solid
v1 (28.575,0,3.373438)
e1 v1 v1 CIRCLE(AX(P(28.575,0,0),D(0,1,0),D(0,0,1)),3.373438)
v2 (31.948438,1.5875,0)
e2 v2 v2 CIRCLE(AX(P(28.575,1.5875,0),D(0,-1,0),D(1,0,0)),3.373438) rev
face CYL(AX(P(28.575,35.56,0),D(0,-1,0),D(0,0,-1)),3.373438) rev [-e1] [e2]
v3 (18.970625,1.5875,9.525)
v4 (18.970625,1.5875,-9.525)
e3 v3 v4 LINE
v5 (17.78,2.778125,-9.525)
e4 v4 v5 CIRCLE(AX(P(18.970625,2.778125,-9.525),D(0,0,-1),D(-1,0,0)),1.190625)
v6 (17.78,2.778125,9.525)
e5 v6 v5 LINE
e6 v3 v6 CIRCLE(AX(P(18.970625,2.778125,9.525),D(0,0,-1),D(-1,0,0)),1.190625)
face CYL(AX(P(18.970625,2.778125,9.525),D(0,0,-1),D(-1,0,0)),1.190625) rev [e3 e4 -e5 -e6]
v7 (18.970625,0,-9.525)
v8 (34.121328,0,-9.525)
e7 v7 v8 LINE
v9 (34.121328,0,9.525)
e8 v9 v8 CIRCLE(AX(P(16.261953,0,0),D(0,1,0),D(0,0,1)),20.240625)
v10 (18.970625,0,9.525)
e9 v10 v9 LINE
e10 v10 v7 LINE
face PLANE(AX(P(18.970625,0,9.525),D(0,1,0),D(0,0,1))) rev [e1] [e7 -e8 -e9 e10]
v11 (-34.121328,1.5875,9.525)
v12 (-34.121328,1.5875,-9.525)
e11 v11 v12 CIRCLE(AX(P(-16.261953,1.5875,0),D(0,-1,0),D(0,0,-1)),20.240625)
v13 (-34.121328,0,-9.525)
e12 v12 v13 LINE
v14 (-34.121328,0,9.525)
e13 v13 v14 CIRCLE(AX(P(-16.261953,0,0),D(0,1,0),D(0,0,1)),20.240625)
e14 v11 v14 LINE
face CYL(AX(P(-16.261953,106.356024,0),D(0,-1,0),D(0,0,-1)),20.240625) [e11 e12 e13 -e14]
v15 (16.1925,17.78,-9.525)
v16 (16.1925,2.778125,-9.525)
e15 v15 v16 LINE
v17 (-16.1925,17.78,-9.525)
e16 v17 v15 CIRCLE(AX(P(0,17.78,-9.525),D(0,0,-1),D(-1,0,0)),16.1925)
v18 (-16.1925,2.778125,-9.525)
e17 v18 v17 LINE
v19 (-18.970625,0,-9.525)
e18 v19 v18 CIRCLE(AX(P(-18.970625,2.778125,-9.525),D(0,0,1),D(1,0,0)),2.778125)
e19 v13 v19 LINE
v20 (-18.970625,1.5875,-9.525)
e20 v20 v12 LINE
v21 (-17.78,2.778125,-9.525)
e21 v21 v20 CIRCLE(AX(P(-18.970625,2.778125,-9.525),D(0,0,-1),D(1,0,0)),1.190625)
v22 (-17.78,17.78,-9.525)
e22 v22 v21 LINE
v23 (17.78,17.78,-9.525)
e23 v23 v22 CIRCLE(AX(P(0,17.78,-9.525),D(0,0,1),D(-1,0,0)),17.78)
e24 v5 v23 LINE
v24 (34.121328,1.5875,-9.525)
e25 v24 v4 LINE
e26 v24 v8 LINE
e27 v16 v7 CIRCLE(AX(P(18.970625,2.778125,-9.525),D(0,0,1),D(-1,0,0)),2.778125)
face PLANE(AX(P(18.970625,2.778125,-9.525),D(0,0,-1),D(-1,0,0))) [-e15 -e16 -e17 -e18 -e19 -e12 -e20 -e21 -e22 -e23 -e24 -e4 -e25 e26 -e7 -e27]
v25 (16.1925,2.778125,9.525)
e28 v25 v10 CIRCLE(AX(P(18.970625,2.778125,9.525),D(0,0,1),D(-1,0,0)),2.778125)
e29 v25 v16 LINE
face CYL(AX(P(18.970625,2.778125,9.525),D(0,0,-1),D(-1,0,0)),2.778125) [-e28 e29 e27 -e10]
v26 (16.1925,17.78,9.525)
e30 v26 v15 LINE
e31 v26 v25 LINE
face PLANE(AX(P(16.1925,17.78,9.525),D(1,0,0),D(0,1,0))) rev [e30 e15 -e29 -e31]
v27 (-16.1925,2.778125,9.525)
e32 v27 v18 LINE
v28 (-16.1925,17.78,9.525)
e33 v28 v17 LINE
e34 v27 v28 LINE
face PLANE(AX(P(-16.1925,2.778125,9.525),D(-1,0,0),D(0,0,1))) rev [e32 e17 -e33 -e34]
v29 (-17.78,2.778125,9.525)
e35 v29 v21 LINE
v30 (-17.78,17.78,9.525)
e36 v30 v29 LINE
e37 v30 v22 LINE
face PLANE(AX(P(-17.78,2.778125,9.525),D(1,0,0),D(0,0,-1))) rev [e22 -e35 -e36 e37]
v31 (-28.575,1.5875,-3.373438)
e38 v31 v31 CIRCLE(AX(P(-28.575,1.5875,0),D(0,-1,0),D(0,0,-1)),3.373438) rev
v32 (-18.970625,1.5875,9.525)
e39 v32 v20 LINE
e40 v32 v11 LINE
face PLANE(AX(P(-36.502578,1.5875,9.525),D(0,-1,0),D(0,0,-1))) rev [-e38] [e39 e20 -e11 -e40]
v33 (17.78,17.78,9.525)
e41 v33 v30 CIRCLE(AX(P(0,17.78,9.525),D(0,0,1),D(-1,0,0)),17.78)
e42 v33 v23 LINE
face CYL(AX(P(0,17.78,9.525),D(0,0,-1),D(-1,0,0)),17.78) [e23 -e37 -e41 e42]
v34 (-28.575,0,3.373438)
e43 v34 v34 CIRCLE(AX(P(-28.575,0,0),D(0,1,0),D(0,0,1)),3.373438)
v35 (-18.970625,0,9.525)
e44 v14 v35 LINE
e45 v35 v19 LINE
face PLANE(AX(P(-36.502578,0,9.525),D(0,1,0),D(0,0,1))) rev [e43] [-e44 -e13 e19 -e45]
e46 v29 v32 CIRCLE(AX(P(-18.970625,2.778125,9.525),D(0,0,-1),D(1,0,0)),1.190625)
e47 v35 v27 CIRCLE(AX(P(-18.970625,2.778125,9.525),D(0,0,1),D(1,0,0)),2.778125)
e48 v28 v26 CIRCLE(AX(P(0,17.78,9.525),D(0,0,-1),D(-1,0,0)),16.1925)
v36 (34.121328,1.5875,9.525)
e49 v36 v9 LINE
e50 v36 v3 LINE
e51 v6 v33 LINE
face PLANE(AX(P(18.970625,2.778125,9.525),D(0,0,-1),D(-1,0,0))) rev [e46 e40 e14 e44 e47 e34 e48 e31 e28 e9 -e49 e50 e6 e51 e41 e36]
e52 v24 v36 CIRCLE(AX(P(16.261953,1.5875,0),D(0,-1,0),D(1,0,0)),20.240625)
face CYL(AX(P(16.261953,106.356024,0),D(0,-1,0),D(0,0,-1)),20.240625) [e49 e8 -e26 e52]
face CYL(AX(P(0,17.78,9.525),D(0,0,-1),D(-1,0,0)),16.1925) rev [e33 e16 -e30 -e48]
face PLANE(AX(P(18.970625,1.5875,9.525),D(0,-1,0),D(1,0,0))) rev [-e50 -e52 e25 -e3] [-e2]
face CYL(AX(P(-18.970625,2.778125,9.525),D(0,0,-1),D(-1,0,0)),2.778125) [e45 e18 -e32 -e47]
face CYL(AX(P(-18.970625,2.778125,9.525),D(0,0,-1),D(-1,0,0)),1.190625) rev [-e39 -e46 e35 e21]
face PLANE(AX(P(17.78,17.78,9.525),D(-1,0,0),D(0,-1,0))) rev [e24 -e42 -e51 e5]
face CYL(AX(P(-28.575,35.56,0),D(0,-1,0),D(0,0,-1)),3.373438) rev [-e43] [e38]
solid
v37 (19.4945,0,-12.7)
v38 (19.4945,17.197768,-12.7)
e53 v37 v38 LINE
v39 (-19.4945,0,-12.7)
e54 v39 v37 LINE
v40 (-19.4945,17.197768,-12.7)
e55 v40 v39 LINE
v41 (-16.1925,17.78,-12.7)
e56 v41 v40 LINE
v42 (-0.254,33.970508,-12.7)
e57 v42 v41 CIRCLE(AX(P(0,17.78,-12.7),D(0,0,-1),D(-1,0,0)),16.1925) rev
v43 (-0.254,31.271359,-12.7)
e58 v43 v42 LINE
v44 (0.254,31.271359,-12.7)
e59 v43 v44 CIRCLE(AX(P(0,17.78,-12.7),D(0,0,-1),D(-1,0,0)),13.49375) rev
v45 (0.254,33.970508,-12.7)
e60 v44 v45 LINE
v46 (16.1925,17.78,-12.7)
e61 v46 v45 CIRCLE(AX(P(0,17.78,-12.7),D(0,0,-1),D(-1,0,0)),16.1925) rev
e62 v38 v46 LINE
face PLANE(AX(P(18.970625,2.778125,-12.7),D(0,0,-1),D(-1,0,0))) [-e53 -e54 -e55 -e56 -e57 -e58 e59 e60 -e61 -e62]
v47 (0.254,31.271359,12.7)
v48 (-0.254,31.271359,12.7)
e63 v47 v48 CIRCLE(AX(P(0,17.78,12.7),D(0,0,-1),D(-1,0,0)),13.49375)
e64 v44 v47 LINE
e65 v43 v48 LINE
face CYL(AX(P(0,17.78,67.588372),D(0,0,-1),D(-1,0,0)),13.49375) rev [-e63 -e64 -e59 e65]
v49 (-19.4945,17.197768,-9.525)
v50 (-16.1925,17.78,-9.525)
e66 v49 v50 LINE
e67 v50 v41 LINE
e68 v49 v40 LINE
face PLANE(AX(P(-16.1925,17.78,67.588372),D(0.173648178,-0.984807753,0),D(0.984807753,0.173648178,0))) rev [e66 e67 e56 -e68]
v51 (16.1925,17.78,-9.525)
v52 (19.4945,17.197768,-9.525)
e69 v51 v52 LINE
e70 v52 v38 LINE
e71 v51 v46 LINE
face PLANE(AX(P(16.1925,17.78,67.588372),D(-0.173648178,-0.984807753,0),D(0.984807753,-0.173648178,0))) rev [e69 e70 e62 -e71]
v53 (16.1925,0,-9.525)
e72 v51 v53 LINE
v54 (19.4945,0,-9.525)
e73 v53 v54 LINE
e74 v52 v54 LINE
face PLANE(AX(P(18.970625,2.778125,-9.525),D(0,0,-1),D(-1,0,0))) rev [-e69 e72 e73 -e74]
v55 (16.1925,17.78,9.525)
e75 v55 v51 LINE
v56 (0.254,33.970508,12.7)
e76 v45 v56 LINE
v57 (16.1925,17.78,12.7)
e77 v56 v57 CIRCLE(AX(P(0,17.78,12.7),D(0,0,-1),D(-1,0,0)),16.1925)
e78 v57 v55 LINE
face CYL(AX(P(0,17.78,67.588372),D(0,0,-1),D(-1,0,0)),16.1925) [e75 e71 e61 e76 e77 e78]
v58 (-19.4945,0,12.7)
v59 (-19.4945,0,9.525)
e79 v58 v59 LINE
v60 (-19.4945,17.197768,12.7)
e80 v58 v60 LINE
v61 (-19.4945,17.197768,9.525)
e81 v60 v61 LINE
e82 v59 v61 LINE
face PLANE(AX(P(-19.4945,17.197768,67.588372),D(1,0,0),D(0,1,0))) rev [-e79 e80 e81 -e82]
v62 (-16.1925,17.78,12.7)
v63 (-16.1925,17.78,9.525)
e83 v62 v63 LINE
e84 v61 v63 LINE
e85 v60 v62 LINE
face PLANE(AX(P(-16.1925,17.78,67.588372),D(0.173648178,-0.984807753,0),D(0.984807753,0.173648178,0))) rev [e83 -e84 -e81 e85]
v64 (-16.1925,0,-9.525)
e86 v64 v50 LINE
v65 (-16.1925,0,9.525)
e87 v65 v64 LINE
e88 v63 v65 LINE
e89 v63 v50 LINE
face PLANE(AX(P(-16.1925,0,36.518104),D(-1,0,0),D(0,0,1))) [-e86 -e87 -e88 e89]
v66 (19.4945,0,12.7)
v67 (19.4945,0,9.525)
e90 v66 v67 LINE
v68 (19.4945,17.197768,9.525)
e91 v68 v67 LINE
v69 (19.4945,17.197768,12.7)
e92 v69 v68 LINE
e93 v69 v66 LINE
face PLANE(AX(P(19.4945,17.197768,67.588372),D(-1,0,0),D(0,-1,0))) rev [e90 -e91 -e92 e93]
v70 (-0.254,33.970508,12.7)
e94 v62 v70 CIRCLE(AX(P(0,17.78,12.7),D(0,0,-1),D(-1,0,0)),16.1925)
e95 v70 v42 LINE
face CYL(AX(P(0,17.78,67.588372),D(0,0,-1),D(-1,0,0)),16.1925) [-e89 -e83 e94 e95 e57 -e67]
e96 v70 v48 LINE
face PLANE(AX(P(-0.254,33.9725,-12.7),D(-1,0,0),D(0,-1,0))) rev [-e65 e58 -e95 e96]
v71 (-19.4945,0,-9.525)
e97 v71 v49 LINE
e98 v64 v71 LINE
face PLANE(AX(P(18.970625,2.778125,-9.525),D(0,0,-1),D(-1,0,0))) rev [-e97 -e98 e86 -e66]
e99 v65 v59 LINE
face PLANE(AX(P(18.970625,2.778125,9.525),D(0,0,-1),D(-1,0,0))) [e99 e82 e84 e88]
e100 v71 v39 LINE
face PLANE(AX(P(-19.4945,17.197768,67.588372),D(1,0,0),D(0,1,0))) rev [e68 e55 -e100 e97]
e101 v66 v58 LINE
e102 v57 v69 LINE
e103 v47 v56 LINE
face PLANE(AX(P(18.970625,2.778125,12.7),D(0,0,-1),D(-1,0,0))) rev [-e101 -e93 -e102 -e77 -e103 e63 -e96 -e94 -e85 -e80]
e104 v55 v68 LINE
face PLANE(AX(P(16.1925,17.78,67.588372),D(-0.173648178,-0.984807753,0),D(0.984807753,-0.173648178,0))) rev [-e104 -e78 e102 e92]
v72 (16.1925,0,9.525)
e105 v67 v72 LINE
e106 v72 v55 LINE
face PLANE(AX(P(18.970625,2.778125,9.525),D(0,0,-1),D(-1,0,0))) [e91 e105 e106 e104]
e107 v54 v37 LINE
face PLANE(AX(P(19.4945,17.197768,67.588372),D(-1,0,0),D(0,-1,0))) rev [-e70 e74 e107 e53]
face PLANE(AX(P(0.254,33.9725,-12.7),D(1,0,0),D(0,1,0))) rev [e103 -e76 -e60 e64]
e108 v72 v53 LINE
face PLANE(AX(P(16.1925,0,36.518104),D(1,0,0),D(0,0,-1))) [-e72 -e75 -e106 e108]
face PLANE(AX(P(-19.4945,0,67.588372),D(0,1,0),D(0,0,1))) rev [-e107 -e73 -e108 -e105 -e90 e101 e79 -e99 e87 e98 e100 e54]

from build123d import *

# Parameters (mm, degrees)
BOSS_EXTRUDE1_DEPTH      = 9.525
SKETCH2_R                = 3.3734375
CUT_EXTRUDE1_DEPTH       = 52.842814688
BOSS_EXTRUDE2_DEPTH      = 12.7
BOSS_EXTRUDE2_DEPTH_BACK = 12.7
SKETCH3_R                = 13.49375
CUT_EXTRUDE2_START       = -9.525
SKETCH7_W                = 20.310078125
SKETCH7_H                = 17.78
CUT_EXTRUDE2_DEPTH       = 19.05
CUT_EXTRUDE3_DEPTH       = 1.5875
CUT_EXTRUDE4_DEPTH       = 53.518966191
CUT_EXTRUDE4_DEPTH_BACK  = 53.518966191
SKETCH11_W               = 0.508
SKETCH11_H               = 2.7011408


# Read off the part's stored shape, not the designer's step: Cut-Extrude3
with BuildPart() as part:
    # Sketch1 → Boss-Extrude1 (new, symmetric)
    with BuildSketch(Plane.XY):
        with BuildLine():
            Line((-36.502578125, 0), (-18.970625, 0))
            ThreePointArc((-18.970625, 0), (-17.006193974, 0.813693974), (-16.1925, 2.778125))
            Line((-16.1925, 2.778125), (-16.1925, 17.78))
            ThreePointArc((-16.1925, 17.78), (0, 33.9725), (16.1925, 17.78))
            Line((16.1925, 17.78), (16.1925, 2.778125))
            ThreePointArc((16.1925, 2.778125), (17.006193974, 0.813693974), (18.970625, 0))
            Line((18.970625, 0), (36.502578125, 0))
            Line((36.502578125, 0), (36.502578125, 1.5875))
            Line((36.502578125, 1.5875), (18.970625, 1.5875))
            ThreePointArc((18.970625, 1.5875), (18.128725989, 1.936225989), (17.78, 2.778125))
            Line((17.78, 2.778125), (17.78, 17.78))
            ThreePointArc((17.78, 17.78), (0, 35.56), (-17.78, 17.78))
            Line((-17.78, 17.78), (-17.78, 2.778125))
            ThreePointArc((-17.78, 2.778125), (-18.128725989, 1.936225989), (-18.970625, 1.5875))
            Line((-18.970625, 1.5875), (-36.502578125, 1.5875))
            Line((-36.502578125, 1.5875), (-36.502578125, 0))
        make_face()
    extrude(amount=BOSS_EXTRUDE1_DEPTH, both=True)

    # Sketch2 → Cut-Extrude1 (cut, through all)
    with BuildSketch(Plane(origin=(0, 0, 0), x_dir=(1, 0, 0), z_dir=(0, 1, 0))):
        with Locations(Location((-28.575, 0, 0), (0, 0, 90))):
            Circle(SKETCH2_R)
        with Locations((28.575, 0)):
            Circle(SKETCH2_R)
    extrude(amount=CUT_EXTRUDE1_DEPTH, mode=Mode.SUBTRACT)

    # Cut-Extrude3 outline → Cut-Extrude3 (cut)
    with BuildSketch(Plane(origin=(0, 0, 0), x_dir=(1, 0, 0), z_dir=(0, 1, 0))):
        with BuildLine():
            Line((36.502578125, 9.525), (34.121328125, 9.525))
            ThreePointArc((34.121328125, 9.525), (35.898243667, 4.909072636), (36.502578125, 0))
            Line((36.502578125, 0), (36.502578125, 9.525))
        make_face()
        with BuildLine():
            Line((36.502578125, -9.525), (36.502578125, 0))
            ThreePointArc((36.502578125, 0), (35.898243667, -4.909072636), (34.121328125, -9.525))
            Line((34.121328125, -9.525), (36.502578125, -9.525))
        make_face()
        with BuildLine():
            ThreePointArc((-36.502578125, 0), (-35.898243667, 4.909072636), (-34.121328125, 9.525))
            Line((-34.121328125, 9.525), (-36.502578125, 9.525))
            Line((-36.502578125, 9.525), (-36.502578125, 0))
        make_face()
        with BuildLine():
            ThreePointArc((-34.121328125, -9.525), (-35.898243667, -4.909072636), (-36.502578125, 0))
            Line((-36.502578125, 0), (-36.502578125, -9.525))
            Line((-36.502578125, -9.525), (-34.121328125, -9.525))
        make_face()
    extrude(amount=CUT_EXTRUDE3_DEPTH, mode=Mode.SUBTRACT)


with BuildPart() as body_2:
    # Sketch3 → Boss-Extrude2 (new, two sides: drawn at the far end of the back side and taken through both)
    with BuildSketch(Plane.XY.offset(-BOSS_EXTRUDE2_DEPTH_BACK)):
        with BuildLine():
            Line((-19.4945, 0), (19.4945, 0))
            Line((19.4945, 0), (19.4945, 17.19776831))
            Line((19.4945, 17.19776831), (16.1925, 17.78))
            ThreePointArc((16.1925, 17.78), (0, 33.9725), (-16.1925, 17.78))
            Line((-16.1925, 17.78), (-19.4945, 17.19776831))
            Line((-19.4945, 17.19776831), (-19.4945, 0))
        make_face()
        with Locations(Location((0, 17.78, 0), (0, 0, 180))):
            Circle(SKETCH3_R, mode=Mode.SUBTRACT)
    extrude(amount=BOSS_EXTRUDE2_DEPTH + BOSS_EXTRUDE2_DEPTH_BACK)

    # Sketch7 → Cut-Extrude2 (cut)
    with BuildSketch(Plane.XY.offset(CUT_EXTRUDE2_START)):
        with Locations((-26.347539063, 8.89)):
            Rectangle(SKETCH7_W, SKETCH7_H)
        with Locations((26.347539063, 8.89)):
            Rectangle(SKETCH7_W, SKETCH7_H)
    extrude(amount=CUT_EXTRUDE2_DEPTH, mode=Mode.SUBTRACT)

    # Sketch11 → Cut-Extrude4 (cut, two sides: drawn at the far end of the back side and taken through both)
    with BuildSketch(Plane.XY.offset(-CUT_EXTRUDE4_DEPTH_BACK)):
        with Locations((0, 32.6219296)):
            Rectangle(SKETCH11_W, SKETCH11_H)
    extrude(amount=CUT_EXTRUDE4_DEPTH + CUT_EXTRUDE4_DEPTH_BACK, mode=Mode.SUBTRACT)


solid = Compound([part.part, body_2.part])
